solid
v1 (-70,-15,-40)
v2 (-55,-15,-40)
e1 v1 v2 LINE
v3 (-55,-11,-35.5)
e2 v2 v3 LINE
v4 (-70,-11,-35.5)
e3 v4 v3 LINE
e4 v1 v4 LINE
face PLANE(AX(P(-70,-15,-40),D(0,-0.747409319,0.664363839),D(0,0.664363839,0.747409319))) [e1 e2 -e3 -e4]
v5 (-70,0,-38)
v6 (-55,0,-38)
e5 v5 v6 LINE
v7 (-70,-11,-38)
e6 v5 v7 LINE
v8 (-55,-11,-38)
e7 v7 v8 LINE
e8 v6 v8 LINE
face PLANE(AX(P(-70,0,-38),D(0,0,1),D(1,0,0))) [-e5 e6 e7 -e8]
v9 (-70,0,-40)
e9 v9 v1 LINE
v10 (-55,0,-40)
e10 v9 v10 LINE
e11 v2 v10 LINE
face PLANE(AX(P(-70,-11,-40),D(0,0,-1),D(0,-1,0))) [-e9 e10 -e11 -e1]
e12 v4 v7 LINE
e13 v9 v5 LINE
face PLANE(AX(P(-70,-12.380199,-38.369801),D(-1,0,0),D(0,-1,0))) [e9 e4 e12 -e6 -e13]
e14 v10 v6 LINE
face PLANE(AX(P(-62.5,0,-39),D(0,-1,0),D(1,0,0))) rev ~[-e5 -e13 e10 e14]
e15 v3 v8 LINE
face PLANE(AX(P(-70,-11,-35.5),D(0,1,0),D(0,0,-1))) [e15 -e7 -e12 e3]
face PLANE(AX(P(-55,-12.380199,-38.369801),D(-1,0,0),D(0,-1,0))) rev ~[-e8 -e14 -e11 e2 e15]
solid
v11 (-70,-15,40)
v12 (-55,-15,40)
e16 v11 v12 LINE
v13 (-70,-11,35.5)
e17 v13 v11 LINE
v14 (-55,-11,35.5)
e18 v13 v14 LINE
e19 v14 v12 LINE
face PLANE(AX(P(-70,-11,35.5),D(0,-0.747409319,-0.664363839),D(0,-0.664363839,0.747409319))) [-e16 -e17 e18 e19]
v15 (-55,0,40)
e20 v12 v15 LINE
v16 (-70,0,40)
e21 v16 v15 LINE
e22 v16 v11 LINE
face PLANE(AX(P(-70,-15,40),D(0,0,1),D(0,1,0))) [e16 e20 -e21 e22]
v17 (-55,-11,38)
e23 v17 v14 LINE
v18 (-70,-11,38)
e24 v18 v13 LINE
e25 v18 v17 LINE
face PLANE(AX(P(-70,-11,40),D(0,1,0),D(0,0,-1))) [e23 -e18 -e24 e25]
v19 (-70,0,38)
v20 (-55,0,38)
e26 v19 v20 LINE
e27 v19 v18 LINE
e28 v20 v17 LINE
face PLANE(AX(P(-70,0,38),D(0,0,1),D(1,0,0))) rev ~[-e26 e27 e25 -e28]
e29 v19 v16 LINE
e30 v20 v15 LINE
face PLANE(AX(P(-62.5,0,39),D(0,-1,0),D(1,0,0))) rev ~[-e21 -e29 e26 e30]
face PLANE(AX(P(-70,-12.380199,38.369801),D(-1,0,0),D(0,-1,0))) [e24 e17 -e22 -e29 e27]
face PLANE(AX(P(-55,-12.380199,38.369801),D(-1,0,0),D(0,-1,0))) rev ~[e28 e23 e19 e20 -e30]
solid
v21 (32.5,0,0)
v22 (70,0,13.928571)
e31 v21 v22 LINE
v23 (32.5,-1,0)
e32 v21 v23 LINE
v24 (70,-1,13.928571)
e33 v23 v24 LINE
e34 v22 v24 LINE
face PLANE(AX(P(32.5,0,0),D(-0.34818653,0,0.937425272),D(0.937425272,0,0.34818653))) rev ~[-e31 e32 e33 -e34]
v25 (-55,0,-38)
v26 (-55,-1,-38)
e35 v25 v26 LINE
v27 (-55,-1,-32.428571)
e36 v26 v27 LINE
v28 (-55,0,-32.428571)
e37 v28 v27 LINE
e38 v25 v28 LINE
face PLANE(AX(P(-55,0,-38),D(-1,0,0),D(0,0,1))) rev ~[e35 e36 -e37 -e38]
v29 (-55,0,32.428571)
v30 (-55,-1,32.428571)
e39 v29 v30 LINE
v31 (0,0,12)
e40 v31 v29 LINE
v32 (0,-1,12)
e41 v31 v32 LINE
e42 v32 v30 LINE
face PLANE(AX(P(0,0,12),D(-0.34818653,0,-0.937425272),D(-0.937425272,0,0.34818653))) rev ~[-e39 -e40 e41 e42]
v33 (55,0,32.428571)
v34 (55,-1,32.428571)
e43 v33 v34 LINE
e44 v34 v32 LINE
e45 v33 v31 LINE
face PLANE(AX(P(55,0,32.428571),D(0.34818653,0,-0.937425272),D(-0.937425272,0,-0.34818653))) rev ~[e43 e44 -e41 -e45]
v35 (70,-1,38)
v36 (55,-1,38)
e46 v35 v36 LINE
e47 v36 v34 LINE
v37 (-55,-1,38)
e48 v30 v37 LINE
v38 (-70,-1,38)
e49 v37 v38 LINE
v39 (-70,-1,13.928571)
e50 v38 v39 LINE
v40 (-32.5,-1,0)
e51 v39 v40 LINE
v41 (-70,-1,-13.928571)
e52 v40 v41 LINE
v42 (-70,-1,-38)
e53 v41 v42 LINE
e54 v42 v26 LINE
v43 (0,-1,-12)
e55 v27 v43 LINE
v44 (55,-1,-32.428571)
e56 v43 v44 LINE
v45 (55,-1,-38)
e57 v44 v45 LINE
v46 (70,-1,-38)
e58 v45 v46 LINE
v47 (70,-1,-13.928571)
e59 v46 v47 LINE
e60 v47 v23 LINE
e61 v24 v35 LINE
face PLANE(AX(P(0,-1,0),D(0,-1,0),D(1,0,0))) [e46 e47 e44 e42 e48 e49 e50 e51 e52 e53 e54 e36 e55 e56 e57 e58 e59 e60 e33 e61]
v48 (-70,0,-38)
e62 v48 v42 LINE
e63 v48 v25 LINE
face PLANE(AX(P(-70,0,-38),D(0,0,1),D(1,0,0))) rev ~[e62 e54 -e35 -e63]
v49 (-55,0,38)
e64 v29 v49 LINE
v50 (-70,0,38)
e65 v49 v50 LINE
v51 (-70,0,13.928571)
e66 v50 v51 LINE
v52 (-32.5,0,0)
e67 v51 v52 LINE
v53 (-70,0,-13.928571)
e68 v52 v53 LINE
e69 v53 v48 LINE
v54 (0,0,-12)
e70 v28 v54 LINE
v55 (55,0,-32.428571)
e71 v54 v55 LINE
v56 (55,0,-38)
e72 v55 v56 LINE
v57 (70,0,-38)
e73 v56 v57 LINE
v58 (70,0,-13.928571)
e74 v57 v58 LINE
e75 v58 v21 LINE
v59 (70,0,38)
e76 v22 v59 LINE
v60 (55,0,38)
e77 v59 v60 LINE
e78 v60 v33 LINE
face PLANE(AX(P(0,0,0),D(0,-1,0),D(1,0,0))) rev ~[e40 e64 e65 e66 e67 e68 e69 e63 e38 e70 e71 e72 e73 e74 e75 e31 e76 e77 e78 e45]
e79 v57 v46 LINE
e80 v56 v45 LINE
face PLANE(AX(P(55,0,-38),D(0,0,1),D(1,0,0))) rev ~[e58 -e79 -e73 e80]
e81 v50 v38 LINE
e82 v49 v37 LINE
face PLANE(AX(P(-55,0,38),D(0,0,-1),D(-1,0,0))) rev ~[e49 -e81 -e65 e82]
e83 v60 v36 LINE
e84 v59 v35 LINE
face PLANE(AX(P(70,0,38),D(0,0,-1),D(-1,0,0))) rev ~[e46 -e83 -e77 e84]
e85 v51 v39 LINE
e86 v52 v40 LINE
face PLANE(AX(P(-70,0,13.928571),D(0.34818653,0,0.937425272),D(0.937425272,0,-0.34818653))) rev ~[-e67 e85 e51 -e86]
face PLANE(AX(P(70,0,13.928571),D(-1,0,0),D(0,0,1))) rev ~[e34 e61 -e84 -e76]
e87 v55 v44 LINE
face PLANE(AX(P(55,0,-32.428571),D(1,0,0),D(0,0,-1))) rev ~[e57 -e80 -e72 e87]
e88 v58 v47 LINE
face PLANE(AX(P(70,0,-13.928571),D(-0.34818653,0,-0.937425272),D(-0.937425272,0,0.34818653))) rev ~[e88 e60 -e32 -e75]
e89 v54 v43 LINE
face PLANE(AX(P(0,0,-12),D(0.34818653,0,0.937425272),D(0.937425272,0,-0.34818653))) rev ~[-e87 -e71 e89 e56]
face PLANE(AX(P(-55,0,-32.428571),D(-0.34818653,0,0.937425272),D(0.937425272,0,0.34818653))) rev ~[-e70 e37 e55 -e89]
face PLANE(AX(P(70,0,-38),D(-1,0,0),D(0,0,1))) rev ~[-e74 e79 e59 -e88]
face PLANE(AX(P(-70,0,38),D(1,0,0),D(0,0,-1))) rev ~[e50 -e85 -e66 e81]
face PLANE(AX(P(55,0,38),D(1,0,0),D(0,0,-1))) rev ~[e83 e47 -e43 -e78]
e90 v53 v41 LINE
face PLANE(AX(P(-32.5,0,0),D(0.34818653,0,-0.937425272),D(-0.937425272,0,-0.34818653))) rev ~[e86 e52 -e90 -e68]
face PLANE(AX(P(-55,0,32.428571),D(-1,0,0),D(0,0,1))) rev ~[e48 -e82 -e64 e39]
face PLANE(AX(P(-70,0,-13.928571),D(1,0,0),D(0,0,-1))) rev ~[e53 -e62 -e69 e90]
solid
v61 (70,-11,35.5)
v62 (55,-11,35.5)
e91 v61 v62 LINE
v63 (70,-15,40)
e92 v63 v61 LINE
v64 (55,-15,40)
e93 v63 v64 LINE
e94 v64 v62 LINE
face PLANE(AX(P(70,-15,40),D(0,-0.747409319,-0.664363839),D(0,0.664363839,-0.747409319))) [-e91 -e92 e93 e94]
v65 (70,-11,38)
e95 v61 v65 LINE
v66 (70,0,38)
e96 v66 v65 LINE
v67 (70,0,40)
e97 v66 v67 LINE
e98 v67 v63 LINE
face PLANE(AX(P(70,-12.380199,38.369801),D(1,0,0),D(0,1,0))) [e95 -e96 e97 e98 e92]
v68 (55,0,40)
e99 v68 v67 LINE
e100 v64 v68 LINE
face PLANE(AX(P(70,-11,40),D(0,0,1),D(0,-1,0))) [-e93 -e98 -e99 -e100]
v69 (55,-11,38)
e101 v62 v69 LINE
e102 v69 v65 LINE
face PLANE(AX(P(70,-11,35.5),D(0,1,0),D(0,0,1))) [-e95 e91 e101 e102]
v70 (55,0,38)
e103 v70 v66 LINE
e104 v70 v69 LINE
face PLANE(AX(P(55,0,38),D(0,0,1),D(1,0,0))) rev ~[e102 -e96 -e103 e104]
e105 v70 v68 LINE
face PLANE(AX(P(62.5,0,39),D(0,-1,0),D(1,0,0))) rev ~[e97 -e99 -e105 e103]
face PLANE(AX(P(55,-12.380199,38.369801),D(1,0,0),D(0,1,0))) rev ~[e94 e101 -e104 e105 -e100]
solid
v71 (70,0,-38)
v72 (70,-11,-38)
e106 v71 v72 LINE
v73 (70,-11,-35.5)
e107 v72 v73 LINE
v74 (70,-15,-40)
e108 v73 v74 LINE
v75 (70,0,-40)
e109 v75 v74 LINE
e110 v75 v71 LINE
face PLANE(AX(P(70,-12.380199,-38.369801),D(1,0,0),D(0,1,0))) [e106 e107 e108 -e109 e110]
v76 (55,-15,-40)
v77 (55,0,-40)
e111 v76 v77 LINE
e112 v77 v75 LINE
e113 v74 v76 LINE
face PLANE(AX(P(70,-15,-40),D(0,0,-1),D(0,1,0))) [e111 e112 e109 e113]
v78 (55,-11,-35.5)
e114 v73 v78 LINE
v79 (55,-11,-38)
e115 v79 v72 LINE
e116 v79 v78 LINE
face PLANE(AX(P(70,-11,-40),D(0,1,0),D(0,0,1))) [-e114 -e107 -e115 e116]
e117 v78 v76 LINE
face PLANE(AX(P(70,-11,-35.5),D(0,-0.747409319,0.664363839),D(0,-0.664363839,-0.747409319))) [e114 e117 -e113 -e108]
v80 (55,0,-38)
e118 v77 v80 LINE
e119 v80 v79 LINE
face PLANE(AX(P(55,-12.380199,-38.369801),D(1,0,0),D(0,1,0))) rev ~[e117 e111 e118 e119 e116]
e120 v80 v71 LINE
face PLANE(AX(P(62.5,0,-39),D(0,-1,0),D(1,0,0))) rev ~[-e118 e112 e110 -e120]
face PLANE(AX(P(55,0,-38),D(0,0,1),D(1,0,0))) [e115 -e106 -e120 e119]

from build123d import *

# Parameters (mm, degrees)
F1_DEPTH  = 1
F0_W      = 15
F0_H      = 2
F2_DEPTH  = 11
F5_DEPTH  = 15
F7_DEPTH  = 15
F9_DEPTH  = 15
F11_DEPTH = 15


# Not quite as in the source:
# - a feature of the source that left no trace in its solid (it failed there, or was rolled back) is left out


with BuildPart() as f1:
    # F0 (on Front) → F1 (new body)
    with BuildSketch(Plane.XZ):
        Polygon((-55, 38), (-70, 38), (-70, 13.9285714286), (-32.5, 0), (-70, -13.9285714286), (-70, -38), (-55, -38), (-55, -32.4285714286), (0, -12), (55, -32.4285714286), (55, -38), (70, -38), (70, -13.9285714286), (32.5, 0), (70, 13.9285714286), (70, 38), (55, 38), (55, 32.4285714286), (0, 12), (-55, 32.4285714286), align=None)
    extrude(amount=F1_DEPTH)


with BuildPart() as f2:
    # F0 (on Front) → F2 (new body)
    with BuildSketch(Plane.XZ):
        with Locations((62.5, 39)):
            Rectangle(F0_W, F0_H)
    extrude(amount=F2_DEPTH)

    # F4 (on face) → F5 (join)
    with BuildSketch(Plane.YZ.offset(70)):
        Polygon((-11, 35.5), (-11, 38), (-11, 40), (-15, 40), align=None)
    extrude(amount=-F5_DEPTH)


with BuildPart() as f2b:
    # F0 (on Front) → F2, piece 2 (new body)
    with BuildSketch(Plane.XZ):
        with Locations((-62.5, 39)):
            Rectangle(F0_W, F0_H)
    extrude(amount=F2_DEPTH)

    # F6 (on face) → F7 (join)
    with BuildSketch(Plane(origin=(-70, 0, 0), x_dir=(0, -1, 0), z_dir=(-1, 0, 0))):
        Polygon((15, 40), (11, 40), (11, 38), (11, 35.5), align=None)
    extrude(amount=-F7_DEPTH)


with BuildPart() as f2c:
    # F0 (on Front) → F2, piece 3 (new body)
    with BuildSketch(Plane.XZ):
        with Locations((-62.5, -39)):
            Rectangle(F0_W, F0_H)
    extrude(amount=F2_DEPTH)

    # F10 (on face) → F11 (join)
    with BuildSketch(Plane(origin=(-70, 0, 0), x_dir=(0, -1, 0), z_dir=(-1, 0, 0))):
        Polygon((11, -35.5), (11, -40), (15, -40), align=None)
    extrude(amount=-F11_DEPTH)


with BuildPart() as f2d:
    # F0 (on Front) → F2, piece 4 (new body)
    with BuildSketch(Plane.XZ):
        with Locations((62.5, -39)):
            Rectangle(F0_W, F0_H)
    extrude(amount=F2_DEPTH)

    # F8 (on face) → F9 (join)
    with BuildSketch(Plane.YZ.offset(70)):
        Polygon((-15, -40), (-11, -40), (-11, -35.5), align=None)
    extrude(amount=-F9_DEPTH)


solid = Compound([f1.part, f2.part, f2b.part, f2c.part, f2d.part])
